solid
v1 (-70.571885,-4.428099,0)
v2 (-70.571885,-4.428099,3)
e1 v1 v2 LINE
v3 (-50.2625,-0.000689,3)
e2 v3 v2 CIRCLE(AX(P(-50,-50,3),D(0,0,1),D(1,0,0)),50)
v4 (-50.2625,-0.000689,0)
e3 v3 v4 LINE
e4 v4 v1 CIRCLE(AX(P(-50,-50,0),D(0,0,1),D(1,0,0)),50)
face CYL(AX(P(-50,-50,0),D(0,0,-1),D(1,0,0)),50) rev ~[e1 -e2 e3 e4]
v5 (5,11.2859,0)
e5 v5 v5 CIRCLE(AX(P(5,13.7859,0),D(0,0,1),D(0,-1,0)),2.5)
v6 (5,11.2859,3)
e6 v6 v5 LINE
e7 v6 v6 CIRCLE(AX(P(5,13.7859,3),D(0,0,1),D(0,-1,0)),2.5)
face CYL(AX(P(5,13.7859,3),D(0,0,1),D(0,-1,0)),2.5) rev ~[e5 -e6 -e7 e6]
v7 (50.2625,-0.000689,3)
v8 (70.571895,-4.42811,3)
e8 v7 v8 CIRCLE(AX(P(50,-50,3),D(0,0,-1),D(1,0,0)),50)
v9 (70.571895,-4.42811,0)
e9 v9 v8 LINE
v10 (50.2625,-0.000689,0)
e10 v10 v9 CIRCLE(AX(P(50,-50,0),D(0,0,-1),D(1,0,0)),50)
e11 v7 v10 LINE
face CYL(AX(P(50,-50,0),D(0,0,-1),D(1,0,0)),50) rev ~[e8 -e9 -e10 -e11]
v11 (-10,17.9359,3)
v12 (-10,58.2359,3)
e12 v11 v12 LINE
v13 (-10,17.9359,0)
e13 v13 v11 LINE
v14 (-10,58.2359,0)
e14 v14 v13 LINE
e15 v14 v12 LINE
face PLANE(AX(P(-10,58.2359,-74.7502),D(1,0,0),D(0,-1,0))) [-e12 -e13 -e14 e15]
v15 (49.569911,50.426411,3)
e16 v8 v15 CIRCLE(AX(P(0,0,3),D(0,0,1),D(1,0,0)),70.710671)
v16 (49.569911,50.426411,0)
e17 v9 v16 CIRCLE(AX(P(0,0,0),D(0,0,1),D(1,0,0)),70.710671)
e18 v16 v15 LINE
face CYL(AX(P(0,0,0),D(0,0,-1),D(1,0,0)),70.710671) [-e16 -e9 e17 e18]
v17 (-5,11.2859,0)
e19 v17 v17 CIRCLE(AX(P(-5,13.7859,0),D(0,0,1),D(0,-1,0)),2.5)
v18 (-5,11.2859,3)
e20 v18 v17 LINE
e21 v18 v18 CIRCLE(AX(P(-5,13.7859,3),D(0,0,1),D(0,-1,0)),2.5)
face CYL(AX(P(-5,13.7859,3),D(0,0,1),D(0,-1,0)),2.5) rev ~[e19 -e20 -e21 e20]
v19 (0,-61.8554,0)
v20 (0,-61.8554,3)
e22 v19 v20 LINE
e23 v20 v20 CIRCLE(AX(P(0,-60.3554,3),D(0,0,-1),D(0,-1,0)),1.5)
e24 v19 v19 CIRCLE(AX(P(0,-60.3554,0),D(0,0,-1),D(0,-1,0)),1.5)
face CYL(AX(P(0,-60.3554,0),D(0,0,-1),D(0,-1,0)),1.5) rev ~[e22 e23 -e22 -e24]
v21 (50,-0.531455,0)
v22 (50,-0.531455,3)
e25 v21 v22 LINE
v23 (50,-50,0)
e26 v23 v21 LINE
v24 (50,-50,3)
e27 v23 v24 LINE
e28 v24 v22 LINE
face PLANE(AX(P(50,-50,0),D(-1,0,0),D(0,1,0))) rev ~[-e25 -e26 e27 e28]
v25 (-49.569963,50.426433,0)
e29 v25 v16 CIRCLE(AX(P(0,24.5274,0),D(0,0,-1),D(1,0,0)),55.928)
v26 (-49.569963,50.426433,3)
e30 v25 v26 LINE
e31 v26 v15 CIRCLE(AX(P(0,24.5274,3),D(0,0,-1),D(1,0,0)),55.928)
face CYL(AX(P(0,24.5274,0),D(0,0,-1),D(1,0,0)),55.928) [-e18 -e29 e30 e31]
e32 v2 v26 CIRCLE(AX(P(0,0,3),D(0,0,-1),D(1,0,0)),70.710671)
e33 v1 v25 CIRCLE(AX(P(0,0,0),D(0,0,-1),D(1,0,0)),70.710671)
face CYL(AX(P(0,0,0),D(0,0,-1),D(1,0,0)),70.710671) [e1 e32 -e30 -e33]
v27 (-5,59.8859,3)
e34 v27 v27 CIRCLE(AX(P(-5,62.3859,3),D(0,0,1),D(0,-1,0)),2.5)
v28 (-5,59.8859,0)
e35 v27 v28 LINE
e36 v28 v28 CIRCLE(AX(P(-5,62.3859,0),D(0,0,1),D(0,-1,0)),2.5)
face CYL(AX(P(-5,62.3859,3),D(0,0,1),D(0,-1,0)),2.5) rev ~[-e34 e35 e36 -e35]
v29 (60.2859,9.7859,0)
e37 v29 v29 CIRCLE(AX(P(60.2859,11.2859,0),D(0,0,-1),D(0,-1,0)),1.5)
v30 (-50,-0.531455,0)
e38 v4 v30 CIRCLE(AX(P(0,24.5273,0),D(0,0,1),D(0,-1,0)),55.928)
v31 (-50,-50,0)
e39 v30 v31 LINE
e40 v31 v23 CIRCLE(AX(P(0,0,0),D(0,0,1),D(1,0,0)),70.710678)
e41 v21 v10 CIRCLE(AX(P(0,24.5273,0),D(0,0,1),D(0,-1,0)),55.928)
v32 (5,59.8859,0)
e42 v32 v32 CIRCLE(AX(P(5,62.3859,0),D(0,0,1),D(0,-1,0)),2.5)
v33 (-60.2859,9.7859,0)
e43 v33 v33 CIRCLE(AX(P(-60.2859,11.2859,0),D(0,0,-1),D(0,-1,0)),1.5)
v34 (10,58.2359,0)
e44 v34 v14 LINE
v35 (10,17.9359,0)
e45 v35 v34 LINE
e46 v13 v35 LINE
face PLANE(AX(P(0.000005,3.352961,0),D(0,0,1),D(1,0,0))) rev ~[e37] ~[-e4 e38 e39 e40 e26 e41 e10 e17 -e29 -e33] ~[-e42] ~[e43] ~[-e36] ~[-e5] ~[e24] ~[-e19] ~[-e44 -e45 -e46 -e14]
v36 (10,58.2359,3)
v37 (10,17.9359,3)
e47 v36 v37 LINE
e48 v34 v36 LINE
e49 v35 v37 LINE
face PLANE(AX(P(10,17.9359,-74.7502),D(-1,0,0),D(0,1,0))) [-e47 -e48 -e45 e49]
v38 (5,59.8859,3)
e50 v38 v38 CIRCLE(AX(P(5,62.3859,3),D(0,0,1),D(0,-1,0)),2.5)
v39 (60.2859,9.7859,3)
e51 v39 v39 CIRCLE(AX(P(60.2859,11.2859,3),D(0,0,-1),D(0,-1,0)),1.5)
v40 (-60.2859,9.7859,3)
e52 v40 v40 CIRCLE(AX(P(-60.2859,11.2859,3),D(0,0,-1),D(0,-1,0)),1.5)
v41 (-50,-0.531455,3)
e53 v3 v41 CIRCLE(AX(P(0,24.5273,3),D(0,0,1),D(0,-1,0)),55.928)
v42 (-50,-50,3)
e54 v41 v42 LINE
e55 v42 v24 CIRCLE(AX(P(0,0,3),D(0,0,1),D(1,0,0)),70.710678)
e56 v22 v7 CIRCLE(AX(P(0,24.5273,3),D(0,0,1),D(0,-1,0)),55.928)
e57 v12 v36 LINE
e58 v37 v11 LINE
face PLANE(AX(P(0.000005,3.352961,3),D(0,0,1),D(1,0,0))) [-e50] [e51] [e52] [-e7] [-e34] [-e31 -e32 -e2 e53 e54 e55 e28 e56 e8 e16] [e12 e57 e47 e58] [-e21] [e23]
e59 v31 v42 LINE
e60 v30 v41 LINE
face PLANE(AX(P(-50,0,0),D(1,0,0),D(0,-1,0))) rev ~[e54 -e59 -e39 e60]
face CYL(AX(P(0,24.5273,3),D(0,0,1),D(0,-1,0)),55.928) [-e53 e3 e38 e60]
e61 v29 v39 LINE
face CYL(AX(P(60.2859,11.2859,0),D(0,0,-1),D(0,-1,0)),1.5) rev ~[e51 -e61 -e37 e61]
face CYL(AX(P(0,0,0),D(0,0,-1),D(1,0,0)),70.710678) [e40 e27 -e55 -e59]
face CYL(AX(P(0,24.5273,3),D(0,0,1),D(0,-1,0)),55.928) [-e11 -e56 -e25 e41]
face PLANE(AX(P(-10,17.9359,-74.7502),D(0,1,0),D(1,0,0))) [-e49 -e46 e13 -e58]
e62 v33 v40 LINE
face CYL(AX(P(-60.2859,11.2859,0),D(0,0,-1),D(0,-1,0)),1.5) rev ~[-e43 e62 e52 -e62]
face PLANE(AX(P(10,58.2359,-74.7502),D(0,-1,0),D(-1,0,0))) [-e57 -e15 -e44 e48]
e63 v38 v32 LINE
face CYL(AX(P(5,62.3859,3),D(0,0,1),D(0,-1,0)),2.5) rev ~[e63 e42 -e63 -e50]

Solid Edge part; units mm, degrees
sketch "Sketch1" plane through (0, 0, 0) normal (0, 0, 1) x (1, 0, 0)
  circle A0 centre (-6.75, 75.7107) radius 1.5
  circle A1 centre (6.75, 75.7107) radius 1.5
  line L0 (-9.75, 57.4107) -> (-21.25, 57.4107)
  line L1 (-21.25, 57.4107) -> (-21.25, 35.4107)
  line L2 (-21.25, 35.4107) -> (-9.75, 35.4107)
  line L3 (-9.75, 57.4107) -> (-9.75, 35.4107)
  circle A2 centre (17.7673, 40.9107) radius 1.5
  line L4 (50, -50) -> (50, 0)
  arc A3 (50, 0) -> (70.5719, -4.4281) centre (50, -50) cw
  arc A4 (70.5719, -4.4281) -> (49.5699, 50.4264) centre (0, 0) ccw
  arc A5 (-49.5699, 50.4264) -> (49.5699, 50.4264) centre (0, 24.5274) cw
  arc A6 (-70.5719, -4.4281) -> (-49.5699, 50.4264) centre (0, 0) cw
  arc A7 (-50, 0) -> (-70.5719, -4.4281) centre (-50, -50) ccw
  line L5 (-50, 0) -> (-50, -50)
  arc A8 (-50, -50) -> (50, -50) centre (0, 0) ccw
  dimension "D1" = 22
  dimension "D2" = 11.5
  dimension "D3" = 3
  dimension "D4" = 3
  dimension "D5" = 3
extrude "Protrusion1" add sketch "Sketch1" along normal blind 3
sketch "Sketch2" plane through (0, 4.8723, 0) normal (0, 0, -1) x (0, 1, 0)
  circle A0 centre (55.2883, -15.5) radius 1
  circle A1 centre (27.7883, -15.5) radius 1
  line L0 (25.0383, -6.5) -> (58.0383, -6.5)
  line L1 (58.0383, -6.5) -> (58.0383, -24.5)
  line L2 (58.0383, -24.5) -> (25.0383, -24.5)
  line L3 (25.0383, -24.5) -> (25.0383, -6.5)
extrude "ExtrudedProtrusion_2" add sketch "Sketch2" along normal blind 5
sketch "Sketch3" plane through (-15.5, 46.4107, 0) normal (0, 0, 1) x (1, 0, 0)
  line L0 (-5.75, 11) -> (5.75, 11)
  line L1 (5.75, 11) -> (5.75, -11)
  line L2 (5.75, -11) -> (-5.75, -11)
  line L3 (-5.75, -11) -> (-5.75, 10.8886)
extrude "Cutout1" cut sketch "Sketch3" against normal blind 126.1563 material side at (-15.5, 57.3607, 0)
sketch "Sketch4" plane through (0, 4.8723, 3) normal (0, 0, 1) x (0, 1, 0)
  circle A0 centre (-65.2277, 0) radius 1.5
  circle A1 centre (6.4136, 60.2859) radius 1.5
  circle A2 centre (6.4136, -60.2859) radius 1.5
extrude "ExtrudedProtrusion_3" add sketch "Sketch4" along normal blind 3
sketch "Sketch5" plane through (0, 4.8723, 0) normal (0, 0, -1) x (0, -1, 0)
  circle A0 centre (-6.4136, 60.2859) radius 1.5
  circle A1 centre (-6.4136, -60.2859) radius 1.5
extrude "ExtrudedCutout_3" cut sketch "Sketch5" against normal blind 1394.131
sketch "Sketch6" plane through (0, 4.8723, 0) normal (0, 0, -1) x (0, -1, 0)
  circle A0 centre (65.2277, 0) radius 1.5
extrude "ExtrudedCutout_4" cut sketch "Sketch6" against normal blind 239.0862
sketch "Sketch7" plane through (0, 4.8723, 3) normal (0, 0, 1) x (0, -1, 0)
  circle A0 centre (-55.2883, -15.5) radius 1
  circle A1 centre (-27.7883, -15.5) radius 1
extrude "ExtrudedCutout_5" cut sketch "Sketch7" against normal blind 54.4855
sketch "Sketch8" plane through (0, 4.8723, 3) normal (0, 0, 1) x (0, -1, 0)
  circle A0 centre (-19.655, 0) radius 55.928
extrude "ExtrudedProtrusion_4" add sketch "Sketch8" against normal blind 3
sketch "Sketch9" plane through (-15.5, 46.4107, -5) normal (0, 0, -1) x (-1, 0, 0)
  line L0 (-9, 16.5) -> (9, 16.5)
  line L1 (9, 16.5) -> (9, -16.5)
  line L2 (9, -16.5) -> (-9, -16.5)
  line L3 (-9, -16.5) -> (-9, 16.5)
  line L4 (-5.75, 11) -> (5.75, 11)
  line L5 (5.75, 11) -> (5.75, -11)
  line L6 (5.75, -11) -> (-5.75, -11)
  line L7 (-5.75, -11) -> (-5.75, 11)
extrude "ExtrudedCutout_6" cut sketch "Sketch9" against normal blind 5
sketch "Sketch10" plane through (0, 4.8723, 3) normal (0, 0, 1) x (0, -1, 0)
  line L0 (-13.0636, -10) -> (-13.0636, 10)
  line L1 (-13.0636, 10) -> (-33.2136, 10)
  line L2 (-33.2136, 10) -> (-53.3636, 10)
  line L3 (-53.3636, 10) -> (-53.3636, -10)
  line L4 (-53.3636, -10) -> (-33.2136, -10)
  line L5 (-33.2136, -10) -> (-13.0636, -10)
  circle A0 centre (-56.6886, -5.0517) radius 2.5
  circle A1 centre (-56.6886, 5) radius 2.5
  circle A2 centre (-9.7386, -5) radius 2.5
  circle A3 centre (-9.7386, 5) radius 2.5
extrude "ExtrudedProtrusion_5" add sketch "Sketch10" against normal blind 77.7502
sketch "Sketch11" plane through (0, 38.0859, -74.7502) normal (0, 0, -1) x (-1, 0, 0)
  line L0 (-10, 20.15) -> (10, 20.15)
  line L1 (10, 20.15) -> (10, -20.15)
  line L2 (10, -20.15) -> (-10, -20.15)
  line L3 (-10, -20.15) -> (-10, 20.15)
  circle A0 centre (-5, 23.475) radius 2.5
  circle A1 centre (5.0517, 23.475) radius 2.5
  circle A2 centre (5, -23.475) radius 2.5
  circle A3 centre (-5, -23.475) radius 2.5
extrude "ExtrudedCutout_7" cut sketch "Sketch11" against normal blind 2727.0102
sketch "Sketch12" plane through (0, 4.8723, 3) normal (0, 0, 1) x (0, -1, 0)
  line L0 (-53.3636, -10) -> (-60.0136, -10)
  line L1 (-60.0136, -10) -> (-60.0136, 10)
  line L2 (-60.0136, 10) -> (-53.3636, 10)
  line L3 (-53.3636, -10) -> (-53.3636, 10)
  line L4 (-13.0636, 10) -> (-6.4136, 10)
  line L5 (-6.4136, 10) -> (-6.4136, -10)
  line L6 (-6.4136, -10) -> (-13.0636, -10)
  line L7 (-13.0636, 10) -> (-13.0636, -10)
extrude "ExtrudedProtrusion_6" add sketch "Sketch12" against normal blind 3
sketch "Sketch13" plane through (0, 4.8723, 3) normal (0, 0, 1) x (0, -1, 0)
  circle A0 centre (-57.5136, 5) radius 2.5
  circle A1 centre (-57.5136, -5) radius 2.5
  circle A2 centre (-8.9136, 5) radius 2.5
  circle A3 centre (-8.9136, -5) radius 2.5
extrude "ExtrudedCutout_8" cut sketch "Sketch13" against normal blind 3
